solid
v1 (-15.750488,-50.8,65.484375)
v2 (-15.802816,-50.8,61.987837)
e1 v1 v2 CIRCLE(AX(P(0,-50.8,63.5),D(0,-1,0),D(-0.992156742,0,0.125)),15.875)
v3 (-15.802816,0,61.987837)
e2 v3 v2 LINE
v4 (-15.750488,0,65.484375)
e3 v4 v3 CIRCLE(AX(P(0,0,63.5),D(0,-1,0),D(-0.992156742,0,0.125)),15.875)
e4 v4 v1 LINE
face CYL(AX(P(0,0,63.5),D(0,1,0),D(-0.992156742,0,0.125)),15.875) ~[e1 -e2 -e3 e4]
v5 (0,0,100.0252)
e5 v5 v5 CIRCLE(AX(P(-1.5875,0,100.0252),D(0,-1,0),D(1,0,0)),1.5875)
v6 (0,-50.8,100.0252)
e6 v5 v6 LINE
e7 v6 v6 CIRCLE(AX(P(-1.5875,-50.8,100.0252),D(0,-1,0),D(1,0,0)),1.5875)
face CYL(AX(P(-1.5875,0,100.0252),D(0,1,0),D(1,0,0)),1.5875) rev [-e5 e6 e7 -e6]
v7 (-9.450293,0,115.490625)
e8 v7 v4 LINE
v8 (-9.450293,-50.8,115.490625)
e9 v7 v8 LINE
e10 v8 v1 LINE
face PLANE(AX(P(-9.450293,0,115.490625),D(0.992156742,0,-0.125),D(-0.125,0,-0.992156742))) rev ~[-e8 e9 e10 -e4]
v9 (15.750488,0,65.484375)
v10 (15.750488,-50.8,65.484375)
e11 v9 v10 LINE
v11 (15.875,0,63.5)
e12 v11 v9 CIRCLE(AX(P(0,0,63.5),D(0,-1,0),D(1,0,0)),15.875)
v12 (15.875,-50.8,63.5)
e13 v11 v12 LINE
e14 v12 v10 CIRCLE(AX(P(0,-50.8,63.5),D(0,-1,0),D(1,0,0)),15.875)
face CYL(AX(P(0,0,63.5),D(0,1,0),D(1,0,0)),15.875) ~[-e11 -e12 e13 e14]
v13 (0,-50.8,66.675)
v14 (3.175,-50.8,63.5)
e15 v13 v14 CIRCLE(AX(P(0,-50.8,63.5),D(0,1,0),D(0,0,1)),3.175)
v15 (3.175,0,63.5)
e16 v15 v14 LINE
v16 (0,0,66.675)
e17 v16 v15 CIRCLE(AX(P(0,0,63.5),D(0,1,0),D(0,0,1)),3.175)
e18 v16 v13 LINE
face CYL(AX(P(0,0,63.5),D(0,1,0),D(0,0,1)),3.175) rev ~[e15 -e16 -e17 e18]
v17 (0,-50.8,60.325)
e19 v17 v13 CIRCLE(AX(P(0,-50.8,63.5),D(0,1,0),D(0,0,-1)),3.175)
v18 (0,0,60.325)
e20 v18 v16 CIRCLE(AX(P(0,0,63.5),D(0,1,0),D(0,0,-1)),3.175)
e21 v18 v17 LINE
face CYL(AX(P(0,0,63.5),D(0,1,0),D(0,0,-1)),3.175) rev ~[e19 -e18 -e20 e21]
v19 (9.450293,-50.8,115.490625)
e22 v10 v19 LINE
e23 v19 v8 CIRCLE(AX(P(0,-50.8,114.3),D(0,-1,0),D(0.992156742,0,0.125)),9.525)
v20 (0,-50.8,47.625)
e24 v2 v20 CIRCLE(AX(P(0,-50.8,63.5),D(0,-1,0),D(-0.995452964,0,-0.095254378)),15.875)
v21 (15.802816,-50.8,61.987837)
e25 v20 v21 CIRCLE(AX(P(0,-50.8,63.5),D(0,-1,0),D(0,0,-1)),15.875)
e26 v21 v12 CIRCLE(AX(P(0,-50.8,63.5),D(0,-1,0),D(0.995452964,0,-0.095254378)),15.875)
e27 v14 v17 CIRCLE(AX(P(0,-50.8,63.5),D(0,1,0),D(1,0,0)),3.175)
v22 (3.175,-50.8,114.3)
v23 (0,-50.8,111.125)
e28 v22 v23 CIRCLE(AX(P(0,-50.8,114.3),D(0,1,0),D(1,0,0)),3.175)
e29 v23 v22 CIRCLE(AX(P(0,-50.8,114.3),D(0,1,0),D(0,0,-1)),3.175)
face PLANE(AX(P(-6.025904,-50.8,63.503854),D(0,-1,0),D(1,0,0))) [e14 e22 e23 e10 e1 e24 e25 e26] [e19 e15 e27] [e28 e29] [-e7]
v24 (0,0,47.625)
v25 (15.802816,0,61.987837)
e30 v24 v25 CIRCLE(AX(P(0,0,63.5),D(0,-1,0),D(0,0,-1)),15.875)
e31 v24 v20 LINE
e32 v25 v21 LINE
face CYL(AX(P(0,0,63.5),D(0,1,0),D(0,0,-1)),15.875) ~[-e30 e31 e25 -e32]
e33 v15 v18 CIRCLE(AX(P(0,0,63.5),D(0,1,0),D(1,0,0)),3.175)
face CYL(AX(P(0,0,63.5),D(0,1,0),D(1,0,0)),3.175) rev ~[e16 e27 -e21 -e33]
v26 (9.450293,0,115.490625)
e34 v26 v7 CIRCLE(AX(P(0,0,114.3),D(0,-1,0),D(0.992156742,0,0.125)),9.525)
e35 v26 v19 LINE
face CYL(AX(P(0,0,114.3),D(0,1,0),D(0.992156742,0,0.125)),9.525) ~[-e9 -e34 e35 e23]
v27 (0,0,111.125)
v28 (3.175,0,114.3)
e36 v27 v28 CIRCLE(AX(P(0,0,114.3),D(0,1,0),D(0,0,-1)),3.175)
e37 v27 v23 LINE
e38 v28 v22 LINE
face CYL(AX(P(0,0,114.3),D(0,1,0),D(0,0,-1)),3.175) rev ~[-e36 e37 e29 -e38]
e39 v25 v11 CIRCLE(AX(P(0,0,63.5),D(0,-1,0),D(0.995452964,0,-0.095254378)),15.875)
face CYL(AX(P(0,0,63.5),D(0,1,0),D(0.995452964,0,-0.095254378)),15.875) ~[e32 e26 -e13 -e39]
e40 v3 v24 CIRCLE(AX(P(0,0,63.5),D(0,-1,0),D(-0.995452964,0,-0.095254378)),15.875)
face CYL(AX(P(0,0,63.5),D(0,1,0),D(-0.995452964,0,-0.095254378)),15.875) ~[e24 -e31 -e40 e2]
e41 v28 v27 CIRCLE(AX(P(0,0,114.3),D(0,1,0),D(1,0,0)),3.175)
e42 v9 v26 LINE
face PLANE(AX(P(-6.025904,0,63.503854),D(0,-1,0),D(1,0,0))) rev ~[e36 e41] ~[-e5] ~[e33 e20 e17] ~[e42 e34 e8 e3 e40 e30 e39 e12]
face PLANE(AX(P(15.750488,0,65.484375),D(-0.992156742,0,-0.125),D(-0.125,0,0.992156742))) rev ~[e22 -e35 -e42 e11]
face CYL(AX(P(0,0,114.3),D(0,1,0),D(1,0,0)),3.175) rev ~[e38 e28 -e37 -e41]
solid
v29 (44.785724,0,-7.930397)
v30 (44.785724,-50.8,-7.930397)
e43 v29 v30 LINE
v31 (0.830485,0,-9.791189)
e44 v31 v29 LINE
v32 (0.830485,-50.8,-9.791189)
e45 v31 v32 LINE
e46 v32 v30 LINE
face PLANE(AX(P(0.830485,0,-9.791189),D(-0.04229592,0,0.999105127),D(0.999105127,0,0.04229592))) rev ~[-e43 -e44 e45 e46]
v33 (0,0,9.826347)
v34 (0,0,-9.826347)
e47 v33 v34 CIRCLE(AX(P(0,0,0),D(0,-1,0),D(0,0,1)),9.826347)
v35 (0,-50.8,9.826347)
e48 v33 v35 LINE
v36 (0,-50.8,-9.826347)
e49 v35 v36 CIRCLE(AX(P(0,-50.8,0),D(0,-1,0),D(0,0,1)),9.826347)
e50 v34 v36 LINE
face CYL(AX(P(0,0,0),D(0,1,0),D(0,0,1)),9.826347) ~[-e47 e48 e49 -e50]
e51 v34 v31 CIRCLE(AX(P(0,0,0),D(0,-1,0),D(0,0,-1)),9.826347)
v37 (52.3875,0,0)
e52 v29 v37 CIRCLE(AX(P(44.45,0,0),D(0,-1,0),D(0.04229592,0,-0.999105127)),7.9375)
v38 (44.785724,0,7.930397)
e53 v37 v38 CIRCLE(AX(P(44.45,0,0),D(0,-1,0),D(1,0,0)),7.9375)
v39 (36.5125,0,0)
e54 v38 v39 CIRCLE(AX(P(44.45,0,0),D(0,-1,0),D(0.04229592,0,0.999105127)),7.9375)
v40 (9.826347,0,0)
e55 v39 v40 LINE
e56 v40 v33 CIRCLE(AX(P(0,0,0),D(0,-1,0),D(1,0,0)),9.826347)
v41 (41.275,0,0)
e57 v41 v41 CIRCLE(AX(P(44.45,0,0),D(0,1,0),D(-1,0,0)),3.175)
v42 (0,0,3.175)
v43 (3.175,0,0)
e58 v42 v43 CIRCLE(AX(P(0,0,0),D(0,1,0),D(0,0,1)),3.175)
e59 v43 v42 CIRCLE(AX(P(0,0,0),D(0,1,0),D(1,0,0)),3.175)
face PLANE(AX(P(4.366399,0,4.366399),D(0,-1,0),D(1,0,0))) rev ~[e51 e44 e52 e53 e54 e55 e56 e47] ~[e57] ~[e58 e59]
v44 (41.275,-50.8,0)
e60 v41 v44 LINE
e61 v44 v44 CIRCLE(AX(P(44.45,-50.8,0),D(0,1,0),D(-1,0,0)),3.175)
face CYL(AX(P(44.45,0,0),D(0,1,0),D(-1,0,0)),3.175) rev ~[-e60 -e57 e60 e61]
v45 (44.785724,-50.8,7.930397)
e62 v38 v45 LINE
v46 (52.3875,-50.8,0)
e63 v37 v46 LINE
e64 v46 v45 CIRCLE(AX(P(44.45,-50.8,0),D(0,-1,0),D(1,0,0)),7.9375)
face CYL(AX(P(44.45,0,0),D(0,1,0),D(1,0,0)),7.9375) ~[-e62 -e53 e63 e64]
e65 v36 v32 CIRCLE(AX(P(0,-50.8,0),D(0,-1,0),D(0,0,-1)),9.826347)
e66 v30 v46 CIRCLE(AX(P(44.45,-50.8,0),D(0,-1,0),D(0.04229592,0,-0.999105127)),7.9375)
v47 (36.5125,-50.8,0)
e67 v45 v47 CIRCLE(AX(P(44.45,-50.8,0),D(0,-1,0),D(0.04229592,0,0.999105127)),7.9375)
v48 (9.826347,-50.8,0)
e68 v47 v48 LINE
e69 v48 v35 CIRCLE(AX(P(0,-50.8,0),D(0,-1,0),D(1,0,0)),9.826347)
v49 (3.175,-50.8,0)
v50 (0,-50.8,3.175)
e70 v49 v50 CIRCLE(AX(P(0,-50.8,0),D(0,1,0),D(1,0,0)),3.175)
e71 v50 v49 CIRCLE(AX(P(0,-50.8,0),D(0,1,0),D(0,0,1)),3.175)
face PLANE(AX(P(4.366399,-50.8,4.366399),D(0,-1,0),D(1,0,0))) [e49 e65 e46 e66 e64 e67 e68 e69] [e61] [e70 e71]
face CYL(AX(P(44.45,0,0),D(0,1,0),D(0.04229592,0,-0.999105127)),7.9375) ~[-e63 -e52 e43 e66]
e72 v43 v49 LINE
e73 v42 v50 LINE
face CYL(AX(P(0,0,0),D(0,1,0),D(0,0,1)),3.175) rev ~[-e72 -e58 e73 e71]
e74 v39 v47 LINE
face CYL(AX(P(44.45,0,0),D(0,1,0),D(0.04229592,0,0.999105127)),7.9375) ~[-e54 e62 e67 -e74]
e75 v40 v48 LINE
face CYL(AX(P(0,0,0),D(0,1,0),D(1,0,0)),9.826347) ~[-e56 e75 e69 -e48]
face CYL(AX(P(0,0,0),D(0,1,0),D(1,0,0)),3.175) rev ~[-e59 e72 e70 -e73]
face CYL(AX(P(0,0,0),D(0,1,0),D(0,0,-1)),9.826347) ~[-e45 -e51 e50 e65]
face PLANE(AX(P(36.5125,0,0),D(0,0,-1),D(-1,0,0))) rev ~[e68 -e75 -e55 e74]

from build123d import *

# Parameters (mm, degrees)
F1_DEPTH = 50.8
F0_R     = 1.5875


with BuildPart() as f1:
    # F0 (on Front) → F1 (new body)
    with BuildSketch(Plane.XZ):
        with BuildLine():
            Line((3.175, 0), (9.8263469772, 0))
            ThreePointArc((9.8263469772, 0), (6.9482765818, 6.9482765818), (0, 9.8263469772))
            Line((0, 9.8263469772), (0, 3.175))
            ThreePointArc((0, 3.175), (2.2450640303, 2.2450640303), (3.175, 0))
        make_face()
        with BuildLine():
            Line((36.5125, 0), (9.8263469772, 0))
            ThreePointArc((9.8263469772, 0), (7.2359425088, -6.6481750072), (0.8304849282, -9.7911893915))
            Line((0.8304849282, -9.7911893915), (44.7857238654, -7.930396947))
            ThreePointArc((44.7857238654, -7.930396947), (38.9573185934, -5.7301271553), (36.5125, 0))
        make_face()
        with BuildLine():
            ThreePointArc((0.8304849282, -9.7911893915), (7.2359425088, -6.6481750072), (9.8263469772, 0))
            Line((9.8263469772, 0), (3.175, 0))
            ThreePointArc((3.175, 0), (-2.2450640303, -2.2450640303), (0, 3.175))
            Line((0, 3.175), (0, 9.8263469772))
            ThreePointArc((0, 9.8263469772), (-9.8263469772, 0), (0, -9.8263469772))
            Line((0, -9.8263469772), (0.8304849282, -9.7911893915))
        make_face()
        with BuildLine():
            ThreePointArc((0, -9.8263469772), (0.4156143861, -9.8175536463), (0.8304849282, -9.7911893915))
            Line((0.8304849282, -9.7911893915), (0, -9.8263469772))
        make_face()
        with BuildLine():
            ThreePointArc((44.7857238654, 7.930396947), (38.9573185934, 5.7301271553), (36.5125, 0))
            ThreePointArc((36.5125, 0), (38.9573185934, -5.7301271553), (44.7857238654, -7.930396947))
            ThreePointArc((44.7857238654, -7.930396947), (50.1801271553, -5.4926814066), (52.3875, 0))
            ThreePointArc((52.3875, 0), (50.1801271553, 5.4926814066), (44.7857238654, 7.930396947))
        make_face()
        with BuildLine():
            ThreePointArc((47.625, 0), (44.45, -3.175), (41.275, 0))
            ThreePointArc((41.275, 0), (44.45, 3.175), (47.625, 0))
        make_face(mode=Mode.SUBTRACT)
    extrude(amount=F1_DEPTH)


with BuildPart() as f1b:
    # F0 (on Front) → F1, piece 2 (new body)
    with BuildSketch(Plane.XZ):
        with BuildLine():
            ThreePointArc((-15.8028158025, 61.9878367443), (-10.677313176, 51.7522083632), (0, 47.625))
            Line((0, 47.625), (0, 60.325))
            ThreePointArc((0, 60.325), (-3.175, 63.5), (0, 66.675))
            Line((0, 66.675), (0, 79.375))
            ThreePointArc((0, 79.375), (-10.5003255158, 75.40625), (-15.7504882737, 65.484375))
            ThreePointArc((-15.7504882737, 65.484375), (-15.8732225611, 63.7375511007), (-15.8028158025, 61.9878367443))
        make_face()
        with BuildLine():
            Line((0, 60.325), (0, 47.625))
            ThreePointArc((0, 47.625), (10.677313176, 51.7522083632), (15.8028158025, 61.9878367443))
            ThreePointArc((15.8028158025, 61.9878367443), (15.8569436819, 62.7430574212), (15.875, 63.5))
            ThreePointArc((15.875, 63.5), (15.8438414904, 64.4941387366), (15.7504882737, 65.484375))
            ThreePointArc((15.7504882737, 65.484375), (10.5003255158, 75.40625), (0, 79.375))
            Line((0, 79.375), (0, 66.675))
            ThreePointArc((0, 66.675), (2.2450640303, 65.7450640303), (3.175, 63.5))
            ThreePointArc((3.175, 63.5), (2.2450640303, 61.2549359697), (0, 60.325))
        make_face()
        with BuildLine():
            Line((-9.4502929642, 115.490625), (-15.7504882737, 65.484375))
            ThreePointArc((-15.7504882737, 65.484375), (-10.5003255158, 75.40625), (0, 79.375))
            Line((0, 79.375), (0, 100.0252))
            Line((0, 100.0252), (0, 104.775))
            ThreePointArc((0, 104.775), (-7.14375, 107.9998046905), (-9.4502929642, 115.490625))
        make_face()
        with Locations((-1.5875, 100.0252)):
            Circle(F0_R, mode=Mode.SUBTRACT)
        with BuildLine():
            Line((0, 100.0252), (0, 79.375))
            ThreePointArc((0, 79.375), (10.5003255158, 75.40625), (15.7504882737, 65.484375))
            Line((15.7504882737, 65.484375), (9.4502929642, 115.490625))
            ThreePointArc((9.4502929642, 115.490625), (9.5063048942, 114.896483242), (9.525, 114.3))
            ThreePointArc((9.525, 114.3), (6.7351920908, 107.5648079092), (0, 104.775))
            Line((0, 104.775), (0, 100.0252))
        make_face()
        with BuildLine():
            ThreePointArc((9.4502929642, 115.490625), (0, 123.825), (-9.4502929642, 115.490625))
            ThreePointArc((-9.4502929642, 115.490625), (-7.14375, 107.9998046905), (0, 104.775))
            ThreePointArc((0, 104.775), (6.7351920908, 107.5648079092), (9.525, 114.3))
            ThreePointArc((9.525, 114.3), (9.5063048942, 114.896483242), (9.4502929642, 115.490625))
        make_face()
        with BuildLine():
            ThreePointArc((3.175, 114.3), (2.2450640303, 112.0549359697), (0, 111.125))
            ThreePointArc((0, 111.125), (-2.2450640303, 116.5450640303), (3.175, 114.3))
        make_face(mode=Mode.SUBTRACT)
    extrude(amount=F1_DEPTH)


solid = Compound([f1.part, f1b.part])
